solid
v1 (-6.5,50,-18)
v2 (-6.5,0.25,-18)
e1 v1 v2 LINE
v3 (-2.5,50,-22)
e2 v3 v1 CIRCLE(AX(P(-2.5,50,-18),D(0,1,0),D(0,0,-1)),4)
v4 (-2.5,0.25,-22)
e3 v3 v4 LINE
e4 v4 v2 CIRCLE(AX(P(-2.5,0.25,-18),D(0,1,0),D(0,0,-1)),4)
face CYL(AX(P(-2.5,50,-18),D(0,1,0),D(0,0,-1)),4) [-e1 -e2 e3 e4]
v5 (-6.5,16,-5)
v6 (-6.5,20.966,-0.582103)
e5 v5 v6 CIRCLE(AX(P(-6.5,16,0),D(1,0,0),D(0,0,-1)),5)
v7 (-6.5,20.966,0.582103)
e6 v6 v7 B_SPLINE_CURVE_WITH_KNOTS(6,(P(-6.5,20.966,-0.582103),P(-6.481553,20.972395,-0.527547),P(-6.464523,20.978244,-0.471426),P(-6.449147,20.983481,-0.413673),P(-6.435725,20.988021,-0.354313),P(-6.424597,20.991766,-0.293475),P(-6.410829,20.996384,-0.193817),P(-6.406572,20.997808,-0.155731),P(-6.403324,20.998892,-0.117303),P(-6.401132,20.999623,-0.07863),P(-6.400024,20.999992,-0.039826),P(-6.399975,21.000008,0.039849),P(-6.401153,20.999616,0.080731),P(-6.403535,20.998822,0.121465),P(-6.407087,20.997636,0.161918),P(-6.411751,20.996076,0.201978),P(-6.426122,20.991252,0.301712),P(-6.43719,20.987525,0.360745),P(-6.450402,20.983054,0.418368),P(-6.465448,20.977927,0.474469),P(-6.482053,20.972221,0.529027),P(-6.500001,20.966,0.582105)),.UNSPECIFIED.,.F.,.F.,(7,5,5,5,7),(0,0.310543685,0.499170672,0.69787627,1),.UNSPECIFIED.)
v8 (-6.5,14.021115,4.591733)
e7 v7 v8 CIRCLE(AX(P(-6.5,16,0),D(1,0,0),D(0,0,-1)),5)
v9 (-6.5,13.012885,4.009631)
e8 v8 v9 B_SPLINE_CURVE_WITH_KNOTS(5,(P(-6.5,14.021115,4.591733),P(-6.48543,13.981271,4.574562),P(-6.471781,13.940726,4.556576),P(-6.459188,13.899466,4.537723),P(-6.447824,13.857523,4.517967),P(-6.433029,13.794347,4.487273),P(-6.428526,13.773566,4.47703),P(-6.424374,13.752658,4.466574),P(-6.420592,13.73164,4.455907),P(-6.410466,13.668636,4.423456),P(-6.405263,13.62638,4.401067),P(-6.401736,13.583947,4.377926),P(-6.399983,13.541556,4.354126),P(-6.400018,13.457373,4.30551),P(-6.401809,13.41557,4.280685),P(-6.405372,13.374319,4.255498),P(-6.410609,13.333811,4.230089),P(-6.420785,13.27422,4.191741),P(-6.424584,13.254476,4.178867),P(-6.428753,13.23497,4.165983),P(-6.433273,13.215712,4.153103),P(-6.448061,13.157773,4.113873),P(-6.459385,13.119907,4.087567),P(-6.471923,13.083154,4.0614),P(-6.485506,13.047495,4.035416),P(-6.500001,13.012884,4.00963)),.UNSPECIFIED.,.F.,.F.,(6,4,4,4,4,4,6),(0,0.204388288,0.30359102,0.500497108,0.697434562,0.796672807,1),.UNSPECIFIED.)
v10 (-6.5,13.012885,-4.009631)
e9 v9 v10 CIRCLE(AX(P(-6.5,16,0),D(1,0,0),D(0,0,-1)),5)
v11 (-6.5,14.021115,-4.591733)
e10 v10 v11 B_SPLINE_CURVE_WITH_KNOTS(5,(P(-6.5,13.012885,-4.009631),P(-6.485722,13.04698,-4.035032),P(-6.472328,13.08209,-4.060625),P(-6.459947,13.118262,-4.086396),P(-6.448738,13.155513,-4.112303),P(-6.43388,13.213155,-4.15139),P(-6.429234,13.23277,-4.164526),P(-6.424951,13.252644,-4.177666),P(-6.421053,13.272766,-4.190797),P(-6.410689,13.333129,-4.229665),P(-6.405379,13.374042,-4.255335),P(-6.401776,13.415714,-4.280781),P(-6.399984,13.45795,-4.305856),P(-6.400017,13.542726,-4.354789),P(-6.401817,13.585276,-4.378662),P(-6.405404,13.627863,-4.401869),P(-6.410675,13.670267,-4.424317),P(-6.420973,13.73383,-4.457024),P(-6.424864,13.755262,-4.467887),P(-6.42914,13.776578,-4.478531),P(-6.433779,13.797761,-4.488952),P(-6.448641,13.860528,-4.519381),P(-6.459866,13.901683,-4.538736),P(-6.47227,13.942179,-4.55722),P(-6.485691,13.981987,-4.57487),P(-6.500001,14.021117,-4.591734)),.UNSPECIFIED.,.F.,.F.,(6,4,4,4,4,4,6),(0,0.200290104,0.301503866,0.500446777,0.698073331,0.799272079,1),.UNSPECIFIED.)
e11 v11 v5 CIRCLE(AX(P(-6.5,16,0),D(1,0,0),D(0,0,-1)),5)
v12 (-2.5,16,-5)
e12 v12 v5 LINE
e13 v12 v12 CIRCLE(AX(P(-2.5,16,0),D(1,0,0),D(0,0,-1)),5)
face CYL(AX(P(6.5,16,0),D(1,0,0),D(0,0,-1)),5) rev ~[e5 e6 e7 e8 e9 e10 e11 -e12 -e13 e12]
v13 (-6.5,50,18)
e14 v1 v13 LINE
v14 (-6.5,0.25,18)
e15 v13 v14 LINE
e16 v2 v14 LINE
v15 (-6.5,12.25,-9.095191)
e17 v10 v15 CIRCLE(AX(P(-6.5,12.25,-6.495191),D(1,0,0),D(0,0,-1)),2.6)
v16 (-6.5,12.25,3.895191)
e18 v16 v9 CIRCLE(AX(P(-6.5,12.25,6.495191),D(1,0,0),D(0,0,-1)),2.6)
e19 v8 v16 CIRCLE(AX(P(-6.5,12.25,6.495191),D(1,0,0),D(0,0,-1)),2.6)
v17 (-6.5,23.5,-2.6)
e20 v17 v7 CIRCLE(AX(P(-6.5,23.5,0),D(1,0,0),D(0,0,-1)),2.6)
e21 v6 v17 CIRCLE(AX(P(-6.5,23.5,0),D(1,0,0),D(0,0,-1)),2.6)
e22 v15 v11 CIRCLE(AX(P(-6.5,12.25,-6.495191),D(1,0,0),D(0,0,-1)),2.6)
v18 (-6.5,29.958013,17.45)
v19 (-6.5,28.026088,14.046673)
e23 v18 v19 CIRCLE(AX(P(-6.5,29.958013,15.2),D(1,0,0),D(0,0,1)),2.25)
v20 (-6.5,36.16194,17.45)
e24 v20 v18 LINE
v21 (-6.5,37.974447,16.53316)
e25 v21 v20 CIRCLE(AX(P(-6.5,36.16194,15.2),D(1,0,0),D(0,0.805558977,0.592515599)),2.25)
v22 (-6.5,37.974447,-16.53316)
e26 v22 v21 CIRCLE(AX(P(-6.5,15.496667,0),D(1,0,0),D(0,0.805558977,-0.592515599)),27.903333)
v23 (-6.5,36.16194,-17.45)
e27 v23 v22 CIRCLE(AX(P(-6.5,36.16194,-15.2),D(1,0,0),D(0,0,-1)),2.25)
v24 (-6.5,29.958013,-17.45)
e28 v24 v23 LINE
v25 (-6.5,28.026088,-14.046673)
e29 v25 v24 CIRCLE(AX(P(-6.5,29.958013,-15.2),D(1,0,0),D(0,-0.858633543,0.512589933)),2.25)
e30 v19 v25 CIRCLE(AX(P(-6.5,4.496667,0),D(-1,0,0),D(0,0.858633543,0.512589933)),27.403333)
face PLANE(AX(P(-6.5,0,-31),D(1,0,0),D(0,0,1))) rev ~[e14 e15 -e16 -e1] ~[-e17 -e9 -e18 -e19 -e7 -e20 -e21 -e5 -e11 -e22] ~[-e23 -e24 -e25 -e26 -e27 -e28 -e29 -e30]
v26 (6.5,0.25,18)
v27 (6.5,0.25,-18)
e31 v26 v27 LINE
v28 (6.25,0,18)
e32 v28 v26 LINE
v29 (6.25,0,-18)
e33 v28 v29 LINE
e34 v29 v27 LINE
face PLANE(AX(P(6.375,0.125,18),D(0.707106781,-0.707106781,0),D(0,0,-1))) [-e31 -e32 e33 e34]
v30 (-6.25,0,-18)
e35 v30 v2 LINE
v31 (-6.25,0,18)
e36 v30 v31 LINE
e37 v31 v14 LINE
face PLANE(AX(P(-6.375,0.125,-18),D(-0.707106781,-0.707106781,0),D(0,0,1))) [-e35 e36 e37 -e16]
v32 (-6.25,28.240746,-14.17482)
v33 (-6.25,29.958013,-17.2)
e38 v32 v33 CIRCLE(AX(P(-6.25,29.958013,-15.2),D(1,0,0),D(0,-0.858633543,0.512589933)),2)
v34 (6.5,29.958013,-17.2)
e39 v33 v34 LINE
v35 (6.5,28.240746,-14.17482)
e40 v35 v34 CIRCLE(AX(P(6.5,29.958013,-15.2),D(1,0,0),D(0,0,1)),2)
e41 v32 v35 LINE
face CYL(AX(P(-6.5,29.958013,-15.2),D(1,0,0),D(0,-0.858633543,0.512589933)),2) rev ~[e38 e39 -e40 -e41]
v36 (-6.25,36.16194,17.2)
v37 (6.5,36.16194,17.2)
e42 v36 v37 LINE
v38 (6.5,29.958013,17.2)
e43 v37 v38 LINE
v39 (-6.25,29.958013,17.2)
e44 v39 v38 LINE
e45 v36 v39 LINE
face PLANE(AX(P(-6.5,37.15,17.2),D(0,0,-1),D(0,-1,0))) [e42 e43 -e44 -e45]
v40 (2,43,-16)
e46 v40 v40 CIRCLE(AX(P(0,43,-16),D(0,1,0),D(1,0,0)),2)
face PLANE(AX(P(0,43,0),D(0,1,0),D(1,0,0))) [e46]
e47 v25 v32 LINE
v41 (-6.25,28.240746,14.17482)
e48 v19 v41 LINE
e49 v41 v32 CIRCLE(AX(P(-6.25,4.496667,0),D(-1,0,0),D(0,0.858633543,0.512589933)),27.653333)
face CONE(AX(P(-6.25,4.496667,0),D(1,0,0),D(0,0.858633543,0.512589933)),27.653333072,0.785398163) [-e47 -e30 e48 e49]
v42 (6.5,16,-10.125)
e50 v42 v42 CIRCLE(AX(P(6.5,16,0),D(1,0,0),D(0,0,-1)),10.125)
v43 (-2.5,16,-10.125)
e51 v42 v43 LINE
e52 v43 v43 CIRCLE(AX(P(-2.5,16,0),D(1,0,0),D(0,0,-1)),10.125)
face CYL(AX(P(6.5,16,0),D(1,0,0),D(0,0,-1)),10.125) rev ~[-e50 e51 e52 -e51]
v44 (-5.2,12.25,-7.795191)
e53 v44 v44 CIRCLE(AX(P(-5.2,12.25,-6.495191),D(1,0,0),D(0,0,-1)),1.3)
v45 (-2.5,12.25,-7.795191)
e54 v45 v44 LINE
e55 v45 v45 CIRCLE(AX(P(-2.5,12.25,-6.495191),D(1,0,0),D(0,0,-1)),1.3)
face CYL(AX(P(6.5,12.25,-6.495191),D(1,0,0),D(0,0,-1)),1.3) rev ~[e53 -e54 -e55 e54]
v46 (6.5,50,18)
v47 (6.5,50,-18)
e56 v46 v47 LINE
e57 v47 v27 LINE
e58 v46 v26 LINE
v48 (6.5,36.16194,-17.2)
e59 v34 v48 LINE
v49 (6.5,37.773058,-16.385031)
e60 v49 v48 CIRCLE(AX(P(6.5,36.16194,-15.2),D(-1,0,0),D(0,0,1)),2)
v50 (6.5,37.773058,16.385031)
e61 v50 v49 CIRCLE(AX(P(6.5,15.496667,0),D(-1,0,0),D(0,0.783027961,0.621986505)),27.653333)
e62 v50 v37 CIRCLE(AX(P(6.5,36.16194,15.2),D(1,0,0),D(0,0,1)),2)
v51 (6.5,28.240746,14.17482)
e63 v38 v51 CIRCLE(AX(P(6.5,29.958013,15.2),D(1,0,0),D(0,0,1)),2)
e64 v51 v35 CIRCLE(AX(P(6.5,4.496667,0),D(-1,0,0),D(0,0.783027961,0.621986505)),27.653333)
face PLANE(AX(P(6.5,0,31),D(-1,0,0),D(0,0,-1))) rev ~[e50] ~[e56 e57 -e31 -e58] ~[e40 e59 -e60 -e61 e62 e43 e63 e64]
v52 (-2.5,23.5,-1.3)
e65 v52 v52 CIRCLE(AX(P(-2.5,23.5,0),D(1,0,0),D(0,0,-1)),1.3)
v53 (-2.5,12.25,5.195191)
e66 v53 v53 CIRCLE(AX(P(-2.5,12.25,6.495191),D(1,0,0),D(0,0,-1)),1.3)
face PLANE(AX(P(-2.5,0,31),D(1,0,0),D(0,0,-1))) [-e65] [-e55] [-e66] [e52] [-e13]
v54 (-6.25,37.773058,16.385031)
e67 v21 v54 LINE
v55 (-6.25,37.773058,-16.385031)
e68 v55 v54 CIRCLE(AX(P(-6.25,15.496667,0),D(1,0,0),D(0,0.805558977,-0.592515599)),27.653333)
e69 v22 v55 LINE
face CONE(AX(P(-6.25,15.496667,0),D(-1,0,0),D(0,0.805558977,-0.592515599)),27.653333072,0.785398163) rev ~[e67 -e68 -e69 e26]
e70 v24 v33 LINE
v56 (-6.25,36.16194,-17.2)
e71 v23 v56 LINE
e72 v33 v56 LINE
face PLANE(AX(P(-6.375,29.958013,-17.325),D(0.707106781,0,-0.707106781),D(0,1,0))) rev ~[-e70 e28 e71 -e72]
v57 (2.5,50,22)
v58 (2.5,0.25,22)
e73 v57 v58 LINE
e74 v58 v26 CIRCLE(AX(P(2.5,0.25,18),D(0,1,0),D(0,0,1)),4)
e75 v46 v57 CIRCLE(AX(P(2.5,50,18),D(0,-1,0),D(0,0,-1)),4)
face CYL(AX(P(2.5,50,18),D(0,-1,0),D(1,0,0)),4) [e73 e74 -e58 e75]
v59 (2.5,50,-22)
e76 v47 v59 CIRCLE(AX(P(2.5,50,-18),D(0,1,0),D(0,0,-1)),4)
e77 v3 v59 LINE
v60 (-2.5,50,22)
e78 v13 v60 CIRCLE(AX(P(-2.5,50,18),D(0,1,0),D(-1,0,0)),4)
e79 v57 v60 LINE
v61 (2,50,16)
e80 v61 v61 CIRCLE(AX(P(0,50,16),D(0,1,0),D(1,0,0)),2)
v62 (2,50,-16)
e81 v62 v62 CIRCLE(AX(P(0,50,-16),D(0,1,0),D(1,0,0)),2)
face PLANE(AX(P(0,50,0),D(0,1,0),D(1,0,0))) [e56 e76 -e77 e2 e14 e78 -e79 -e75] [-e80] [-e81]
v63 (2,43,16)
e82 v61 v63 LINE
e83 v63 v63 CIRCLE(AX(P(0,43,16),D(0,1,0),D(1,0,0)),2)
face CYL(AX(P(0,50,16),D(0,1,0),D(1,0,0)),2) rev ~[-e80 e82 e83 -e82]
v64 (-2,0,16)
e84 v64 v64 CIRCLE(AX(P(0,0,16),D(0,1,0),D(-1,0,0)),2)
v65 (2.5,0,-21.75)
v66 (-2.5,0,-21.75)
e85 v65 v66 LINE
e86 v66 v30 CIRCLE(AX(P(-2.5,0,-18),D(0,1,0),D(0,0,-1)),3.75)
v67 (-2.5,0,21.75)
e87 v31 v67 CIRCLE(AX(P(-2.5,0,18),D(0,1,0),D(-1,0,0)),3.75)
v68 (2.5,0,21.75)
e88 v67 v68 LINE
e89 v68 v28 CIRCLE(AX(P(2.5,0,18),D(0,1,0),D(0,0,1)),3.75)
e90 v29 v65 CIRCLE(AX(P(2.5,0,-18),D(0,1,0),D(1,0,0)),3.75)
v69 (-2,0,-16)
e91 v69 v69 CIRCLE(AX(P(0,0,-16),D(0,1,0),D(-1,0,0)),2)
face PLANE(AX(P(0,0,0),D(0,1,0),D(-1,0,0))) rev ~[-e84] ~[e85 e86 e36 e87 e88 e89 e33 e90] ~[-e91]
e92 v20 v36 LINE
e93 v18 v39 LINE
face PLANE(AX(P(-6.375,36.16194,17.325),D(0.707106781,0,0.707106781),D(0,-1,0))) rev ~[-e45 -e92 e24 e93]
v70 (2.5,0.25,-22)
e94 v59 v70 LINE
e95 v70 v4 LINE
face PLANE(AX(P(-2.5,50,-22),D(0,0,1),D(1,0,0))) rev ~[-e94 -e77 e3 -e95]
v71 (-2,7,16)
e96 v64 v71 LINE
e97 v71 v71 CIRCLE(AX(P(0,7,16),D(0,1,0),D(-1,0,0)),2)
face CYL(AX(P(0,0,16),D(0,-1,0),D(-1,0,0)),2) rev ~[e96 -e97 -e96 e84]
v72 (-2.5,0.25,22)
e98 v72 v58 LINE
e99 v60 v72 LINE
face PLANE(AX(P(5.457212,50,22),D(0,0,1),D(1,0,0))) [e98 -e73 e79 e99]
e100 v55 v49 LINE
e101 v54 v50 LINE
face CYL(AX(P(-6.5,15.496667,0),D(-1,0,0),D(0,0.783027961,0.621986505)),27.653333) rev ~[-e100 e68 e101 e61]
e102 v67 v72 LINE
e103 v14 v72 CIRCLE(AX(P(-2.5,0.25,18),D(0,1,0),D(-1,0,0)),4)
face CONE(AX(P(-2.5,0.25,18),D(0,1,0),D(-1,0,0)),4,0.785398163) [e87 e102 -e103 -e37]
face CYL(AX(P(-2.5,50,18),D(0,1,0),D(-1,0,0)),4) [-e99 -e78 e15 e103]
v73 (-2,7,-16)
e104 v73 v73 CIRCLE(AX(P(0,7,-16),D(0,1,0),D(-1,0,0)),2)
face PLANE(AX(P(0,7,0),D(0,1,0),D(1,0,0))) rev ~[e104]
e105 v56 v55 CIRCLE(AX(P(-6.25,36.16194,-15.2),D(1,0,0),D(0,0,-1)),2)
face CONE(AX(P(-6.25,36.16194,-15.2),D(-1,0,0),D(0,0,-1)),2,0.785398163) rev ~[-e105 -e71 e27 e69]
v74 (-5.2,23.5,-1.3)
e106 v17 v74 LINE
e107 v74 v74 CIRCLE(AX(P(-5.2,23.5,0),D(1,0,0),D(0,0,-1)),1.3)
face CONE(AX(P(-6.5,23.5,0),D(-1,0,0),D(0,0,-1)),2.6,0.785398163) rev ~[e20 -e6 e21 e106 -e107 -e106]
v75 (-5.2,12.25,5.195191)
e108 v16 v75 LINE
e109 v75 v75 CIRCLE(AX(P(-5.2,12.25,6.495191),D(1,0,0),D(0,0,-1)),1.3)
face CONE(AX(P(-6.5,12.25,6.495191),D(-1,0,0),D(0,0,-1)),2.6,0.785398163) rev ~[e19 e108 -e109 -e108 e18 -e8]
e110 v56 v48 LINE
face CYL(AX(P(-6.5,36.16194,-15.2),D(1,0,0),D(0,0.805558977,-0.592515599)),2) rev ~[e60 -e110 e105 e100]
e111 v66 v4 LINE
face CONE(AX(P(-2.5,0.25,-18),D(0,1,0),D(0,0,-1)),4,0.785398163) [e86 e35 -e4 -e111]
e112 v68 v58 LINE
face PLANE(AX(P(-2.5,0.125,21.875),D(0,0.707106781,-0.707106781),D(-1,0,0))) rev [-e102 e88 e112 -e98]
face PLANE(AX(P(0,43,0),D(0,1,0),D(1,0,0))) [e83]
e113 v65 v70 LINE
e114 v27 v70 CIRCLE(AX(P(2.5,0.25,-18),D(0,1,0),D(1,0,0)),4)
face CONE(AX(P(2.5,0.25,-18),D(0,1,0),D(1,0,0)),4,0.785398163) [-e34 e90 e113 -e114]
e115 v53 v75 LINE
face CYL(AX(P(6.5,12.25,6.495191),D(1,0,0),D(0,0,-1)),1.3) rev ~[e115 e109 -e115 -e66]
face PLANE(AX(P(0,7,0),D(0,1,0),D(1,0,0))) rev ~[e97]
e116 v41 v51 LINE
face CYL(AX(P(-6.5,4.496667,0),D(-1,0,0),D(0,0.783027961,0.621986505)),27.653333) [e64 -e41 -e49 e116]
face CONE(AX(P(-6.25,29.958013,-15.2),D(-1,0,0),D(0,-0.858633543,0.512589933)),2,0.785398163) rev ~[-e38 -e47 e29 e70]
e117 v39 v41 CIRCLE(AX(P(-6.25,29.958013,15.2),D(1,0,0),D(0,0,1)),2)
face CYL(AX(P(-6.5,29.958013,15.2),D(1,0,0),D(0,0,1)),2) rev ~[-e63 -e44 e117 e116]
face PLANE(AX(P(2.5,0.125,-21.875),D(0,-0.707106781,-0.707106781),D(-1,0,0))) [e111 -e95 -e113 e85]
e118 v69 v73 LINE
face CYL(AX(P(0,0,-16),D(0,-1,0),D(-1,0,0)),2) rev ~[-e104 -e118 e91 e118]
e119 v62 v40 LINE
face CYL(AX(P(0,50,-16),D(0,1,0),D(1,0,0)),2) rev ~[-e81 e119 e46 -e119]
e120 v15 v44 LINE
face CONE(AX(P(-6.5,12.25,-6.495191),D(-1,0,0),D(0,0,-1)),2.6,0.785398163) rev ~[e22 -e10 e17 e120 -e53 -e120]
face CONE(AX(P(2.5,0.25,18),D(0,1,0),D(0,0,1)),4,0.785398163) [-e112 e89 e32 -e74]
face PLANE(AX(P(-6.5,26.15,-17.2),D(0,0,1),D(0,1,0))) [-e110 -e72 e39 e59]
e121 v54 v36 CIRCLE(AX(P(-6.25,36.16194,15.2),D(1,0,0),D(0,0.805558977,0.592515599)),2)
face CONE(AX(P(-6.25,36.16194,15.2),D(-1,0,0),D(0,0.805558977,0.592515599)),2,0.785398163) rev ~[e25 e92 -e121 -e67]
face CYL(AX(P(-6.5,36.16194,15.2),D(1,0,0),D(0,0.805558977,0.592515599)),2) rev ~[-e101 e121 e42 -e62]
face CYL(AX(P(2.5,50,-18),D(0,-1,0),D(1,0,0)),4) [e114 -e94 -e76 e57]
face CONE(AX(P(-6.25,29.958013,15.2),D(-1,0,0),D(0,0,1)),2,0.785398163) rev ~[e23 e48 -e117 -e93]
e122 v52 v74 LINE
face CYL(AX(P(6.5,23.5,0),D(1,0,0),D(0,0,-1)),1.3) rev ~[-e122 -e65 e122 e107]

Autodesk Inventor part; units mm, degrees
ref_plane "YZ Plane" through (0, 0, 0) normal (1, 0, 0) x (0, 1, 0)
ref_plane "XZ Plane" through (0, 0, 0) normal (0, 1, 0) x (-1, 0, 0)
ref_plane "XY Plane" through (0, 0, 0) normal (0, 0, 1) x (1, 0, 0)
sketch "Эскиз1" plane through (0, 0, 0) normal (0, 1, 0) x (-1, 0, 0)
  line L0 (6.5, 31) -> (-6.5, 31)
  line L1 (-6.5, 31) -> (-6.5, -31)
  line L2 (-6.5, -31) -> (6.5, -31)
  line L3 (6.5, -31) -> (6.5, 31)
  line L4 (-6.5, 31) -> (6.5, -31) construction
  line L5 (0, 31) -> (0, -31) construction
  circle A0 centre (0, 16) radius 2
  line L6 (6.5, 0) -> (-6.5, 0) construction
  circle A1 centre (0, -16) radius 2
  point P0 (0, 0)
  point P1 (0, 0)
  dimension "d0" = 13
  dimension "d1" = 62
  dimension "d2" = 16
  dimension "d3" = 4
extrude "Выдавливание1" add sketch "Эскиз1" along normal blind 32
sketch "Эскиз2" plane through (6.5, 0, 31) normal (1, 0, 0) x (0, 0, -1)
  line L0 (0, 32) -> (62, 32)
  line L1 (62, 0) -> (0, 0)
  line L2 (62, 32) -> (0, 0) construction
  circle A0 centre (31, 16) radius 10.15
  line L3 (20.85, 16) -> (41.15, 16) construction
  circle A1 centre (31, 16) radius 10.125
  line L4 (31, 26.125) -> (31, 5.875)
  line L5 (62, 0) -> (62, 32)
  circle A2 centre (31, 16) radius 5
  line L6 (31, 16) -> (24.504809, 12.25) construction
  line L7 (31, 16) -> (37.495191, 12.25) construction
  circle A3 centre (31, 16) radius 7.5 construction
  circle A4 centre (31, 23.5) radius 1.3
  circle A5 centre (37.495191, 12.25) radius 1.3
  circle A6 centre (24.504809, 12.25) radius 1.3
  line L8 (37.495191, 12.25) -> (36.55555, 10.622495) construction
  circle A7 centre (31, 16) radius 10 construction
  line L9 (37.495191, 12.25) -> (39.660254, 11) construction
  point P0 (31, 0)
  dimension "d60" = 20
  dimension "d9" = 20.3
  dimension "d17" = 10
  dimension "d21" = 20.25
  dimension "d57" = 120
  dimension "d58" = 120
  dimension "d59" = 2.6
  dimension "d61" = 2.5
  dimension "d65" = 15
extrude "Выдавливание3" cut sketch "Эскиз2" against normal through all contours A4 L4 | L4 A4 | A2 L4 | L4 A2 | A5 | A6
sketch "Эскиз2 outline for Выдавливание4" plane through (6.5, 0, 31) normal (1, 0, 0) x (0, 0, -1)
  circle A0 centre (31, 16) radius 10.125
extrude "Выдавливание4" cut sketch "Эскиз2 outline for Выдавливание4" against normal blind 9
sketch "Эскиз3" plane through (0, 32, 0) normal (0, 1, 0) x (1, 0, 0)
  circle A0 centre (0, -16) radius 2 projected
  circle A1 centre (0, 16) radius 2 projected
  point P0 (0, 0)
extrude "Выдавливание5" add sketch "Эскиз3" against normal blind 25
fillet "Сопряжение1" radius 6 2 edges at (6.5, 16, 31) (6.5, 16, -31)
chamfer "Фаска1" distance 1.3 angle 45 3 edges at (-6.5, 12.25, 7.7952) (-6.5, 12.25, -5.1952) (-6.5, 23.5, 1.3)
sketch "Эскиз6" plane through (0, 32, 0) normal (0, 1, 0) x (1, 0, 0)
  arc A0 (6.5, 25) -> (0.5, 31) centre (0.5, 25) ccw projected
  line L0 (0.5, 31) -> (-6.5, 31) projected
  line L1 (-6.5, 31) -> (-6.5, -31) projected
  line L2 (-6.5, -31) -> (0.5, -31) projected
  arc A1 (0.5, -31) -> (6.5, -25) centre (0.5, -25) ccw projected
  line L3 (6.5, -25) -> (6.5, 25) projected
  point P0 (0, 0)
extrude "Выдавливание6" add sketch "Эскиз6" along normal blind 18
sketch "Эскиз7" plane through (0, 50, 0) normal (0, 1, 0) x (1, 0, 0)
  circle A0 centre (0, -16) radius 2 projected
  circle A1 centre (0, 16) radius 2 projected
  point P0 (0, 0)
extrude "Выдавливание7" cut sketch "Эскиз7" against normal blind 7
sketch "Эскиз9" plane through (-6.5, 0, -31) normal (-1, 0, 0) x (0, 0, 1)
  line L0 (0, 0) -> (0, 50)
  line L1 (0, 50) -> (62, 0) construction
  line L2 (7.2, 43) -> (54.8, 43)
  line L3 (54.8, 43) -> (54.8, 7)
  line L4 (54.8, 7) -> (7.2, 7)
  line L5 (7.2, 7) -> (7.2, 43)
  line L6 (0, 50) -> (62, 50)
  line L7 (0, 0) -> (62, 0)
  line L8 (62, 0) -> (62, 50)
  line L9 (62, 0) -> (56, 0)
  line L10 (7.2, 43) -> (0, 43) construction
  line L11 (7.2, 7) -> (0, 7) construction
  line L12 (54.8, 7) -> (62, 7) construction
  line L13 (54.8, 43) -> (62, 43) construction
  arc A0 (0, 7) -> (0, 43) centre (-18.9, 25) ccw
  arc A1 (62, 43) -> (62, 7) centre (80.9, 25) ccw
  line L14 (13.8, 38.870968) -> (48.2, 38.870968) construction
  line L15 (48.2, 38.870968) -> (48.2, 26.15)
  line L16 (48.2, 26.15) -> (13.8, 26.15) construction
  line L17 (13.8, 26.15) -> (13.8, 38.870968)
  line L18 (31, 38.870968) -> (31, 50) construction
  arc A2 (48.2, 26.15) -> (13.8, 26.15) centre (31, 4.496667) ccw
  arc A3 (26.990369, 13.012884) -> (35.009631, 13.012884) centre (31, 16) ccw
  arc A4 (48.2, 37.15) -> (13.8, 37.15) centre (31, 15.496667) ccw
  line L19 (13.8, 37.15) -> (48.2, 37.15) construction
  circle A5 centre (31, 16) radius 10.15 construction
  point P0 (31, 0)
  point P1 (31, 25)
  point P2 (54.8, 25)
  point P3 (7.2, 25)
  point P4 (31, 32.15)
  dimension "d30" = 7
  dimension "d31" = 7
  dimension "d33" = 7.2
  dimension "d42" = 6.6
  dimension "d44" = 11
  dimension "d45" = 6
extrude "Выдавливание8" cut sketch "Эскиз9" against normal up to surface (13 mm away) contours L0 A0 | A1 L8
extrude "Выдавливание9" cut sketch "Эскиз9" against normal up to surface (13 mm away) contours A4 L2 | L2 A4 L15 A2 L17
fillet "Сопряжение2" radius 2 4 edges at (0, 26.15, 17.2) (0, 26.15, -17.2) (0, 37.15, 17.2) (0, 37.15, -17.2)
sketch "Эскиз11" plane through (0, 50, 0) normal (0, 1, 0) x (1, 0, 0)
  arc A0 (1, -22) -> (-3, -26) centre (1, -26) ccw
  line L0 (-3, -29.486243) -> (-3, -26)
  line L1 (5.457212, -22) -> (-4.601252, -22)
  arc A1 (-3, -29.486243) -> (-1.997801, -32.134486) centre (1, -29.486243) ccw
  arc A2 (-3, -29.486243) -> (-1.997801, -32.134486) centre (1, -29.486243) ccw
  line L2 (-1.997801, -32.134486) -> (17.505015, -54.211602)
  line L3 (6.5, -25) -> (6.5, 25)
  line L4 (5.457212, -22) -> (6.5, -22)
  arc A3 (0.5, -31) -> (6.5, -25) centre (0.5, -25) ccw
  line L5 (-6.5, -31) -> (0.5, -31)
  line L6 (6.5, -31) -> (6.5, 31)
  point P0 (0, 0)
  point P1 (-2.702505, -31)
  point P2 (-2.877907, -22)
  point P3 (0.96893, -22.000121)
extrude "Выдавливание10" cut sketch "Эскиз11" against normal up to surface (50 mm away)
mirror "Зеркальное отражение1" about plane through (0, 0, 0) normal (0, 0, 1) of "Выдавливание10"
fillet "Сопряжение3" radius 4 2 edges at (6.5, 25, 22) (6.5, 25, -22)
sketch "Эскиз12" plane through (0, 50, 0) normal (0, 1, 0) x (1, 0, 0)
  circle A0 centre (0, 16) radius 2
  circle A1 centre (0, -16) radius 2
  circle A2 centre (0, -16) radius 2
  line L0 (0, 16) -> (0, -16)
  arc A3 (6.5, 18) -> (2.5, 22) centre (2.5, 18) ccw
  line L1 (6.5, -18) -> (6.5, 18)
  arc A4 (2.5, -22) -> (6.5, -18) centre (2.5, -18) ccw
  arc A5 (-2.5, 22) -> (-6.5, 18) centre (-2.5, 18) ccw
  line L2 (-6.5, -18) -> (-6.5, 18)
  arc A6 (-6.5, -18) -> (-2.5, -22) centre (-2.5, -18) ccw
  arc A7 (6.5, 18) -> (2.5, 22) centre (2.5, 18) ccw
  line L3 (2.5, 22) -> (1, 22)
  arc A8 (-3, 26) -> (1, 22) centre (1, 26) ccw
  line L4 (-3, 26) -> (-3, 29.486243)
  arc A9 (-2.702505, 31) -> (-3, 29.486243) centre (1, 29.486243) ccw
  line L5 (-2.702505, 31) -> (-6.5, 31)
  line L6 (-6.5, 31) -> (-6.5, -31)
  line L7 (-6.5, -31) -> (-2.702505, -31)
  arc A10 (-3, -29.486243) -> (-2.702505, -31) centre (1, -29.486243) ccw
  line L8 (-3, -29.486243) -> (-3, -26)
  arc A11 (1, -22) -> (-3, -26) centre (1, -26) ccw
  line L9 (1, -22) -> (2.5, -22)
  arc A12 (2.5, -22) -> (6.5, -18) centre (2.5, -18) ccw
  line L10 (6.5, -18) -> (6.5, 18)
  circle A13 centre (0, 16) radius 2
  circle A14 centre (0, -16) radius 2
  line L11 (1, 22) -> (2.5, 22)
  line L12 (-2.5, 22) -> (2.5, 22)
  line L13 (2.5, -22) -> (1, -22)
  line L14 (-2.5, -22) -> (1, -22)
  point P0 (0, 0)
  point P1 (1, 22)
extrude "Выдавливание11" cut sketch "Эскиз12" against normal up to surface (50 mm away) contours L12 A5 L6 L5 A9 L4 A8 | A11 L8 A10 L7 L6 A6 L14
chamfer "Фаска2" distance 0.25 angle 45 8 edges at (6.5, 0, 0) (5.3284, 0, -20.8284) (0, 0, -22) (-5.3284, 0, -20.8284) (-6.5, 0, 0) (-5.3284, 0, 20.8284) (0, 0, 22) (5.3284, 0, 20.8284)
chamfer "Фаска3" distance 0.25 angle 45 8 edges at (-6.5, 43.15, 0) (-6.5, 37.0647, 16.9847) (-6.5, 33.06, 17.2) (-6.5, 28.2187, 16.1873) (-6.5, 32.15, 0) (-6.5, 28.2187, -16.1873) (-6.5, 33.06, -17.2) (-6.5, 37.0647, -16.9847)
sketch "Эскиз13" plane through (0, 0, 0) normal (0, -1, 0) x (1, 0, 0)
  point P0 (0, 0)
equation "\"d58\" = d57"
equation "\"d31\" = d30"
equation "\"Радиус_гибки\" = Толщина"
equation "\"Ширина_просечки\" = Толщина"
equation "\"Глубина_просечки\" = 0.5 * Толщина"
equation "\"Размер_просечки\" = 4 * Толщина"
equation "\"Мин_остаток\" = 2 * Толщина"
equation "\"Радиус_перехода\" = Радиус_гибки"
equation "\"Радиус_Якоби\" = Радиус_гибки"
equation "\"Размер_зазора\" = Толщина"
equation "\"Толщина\" = 3.048"
properties part number "motor_mount_edge_v2" material "Полиэтилен, низкая плотность"
